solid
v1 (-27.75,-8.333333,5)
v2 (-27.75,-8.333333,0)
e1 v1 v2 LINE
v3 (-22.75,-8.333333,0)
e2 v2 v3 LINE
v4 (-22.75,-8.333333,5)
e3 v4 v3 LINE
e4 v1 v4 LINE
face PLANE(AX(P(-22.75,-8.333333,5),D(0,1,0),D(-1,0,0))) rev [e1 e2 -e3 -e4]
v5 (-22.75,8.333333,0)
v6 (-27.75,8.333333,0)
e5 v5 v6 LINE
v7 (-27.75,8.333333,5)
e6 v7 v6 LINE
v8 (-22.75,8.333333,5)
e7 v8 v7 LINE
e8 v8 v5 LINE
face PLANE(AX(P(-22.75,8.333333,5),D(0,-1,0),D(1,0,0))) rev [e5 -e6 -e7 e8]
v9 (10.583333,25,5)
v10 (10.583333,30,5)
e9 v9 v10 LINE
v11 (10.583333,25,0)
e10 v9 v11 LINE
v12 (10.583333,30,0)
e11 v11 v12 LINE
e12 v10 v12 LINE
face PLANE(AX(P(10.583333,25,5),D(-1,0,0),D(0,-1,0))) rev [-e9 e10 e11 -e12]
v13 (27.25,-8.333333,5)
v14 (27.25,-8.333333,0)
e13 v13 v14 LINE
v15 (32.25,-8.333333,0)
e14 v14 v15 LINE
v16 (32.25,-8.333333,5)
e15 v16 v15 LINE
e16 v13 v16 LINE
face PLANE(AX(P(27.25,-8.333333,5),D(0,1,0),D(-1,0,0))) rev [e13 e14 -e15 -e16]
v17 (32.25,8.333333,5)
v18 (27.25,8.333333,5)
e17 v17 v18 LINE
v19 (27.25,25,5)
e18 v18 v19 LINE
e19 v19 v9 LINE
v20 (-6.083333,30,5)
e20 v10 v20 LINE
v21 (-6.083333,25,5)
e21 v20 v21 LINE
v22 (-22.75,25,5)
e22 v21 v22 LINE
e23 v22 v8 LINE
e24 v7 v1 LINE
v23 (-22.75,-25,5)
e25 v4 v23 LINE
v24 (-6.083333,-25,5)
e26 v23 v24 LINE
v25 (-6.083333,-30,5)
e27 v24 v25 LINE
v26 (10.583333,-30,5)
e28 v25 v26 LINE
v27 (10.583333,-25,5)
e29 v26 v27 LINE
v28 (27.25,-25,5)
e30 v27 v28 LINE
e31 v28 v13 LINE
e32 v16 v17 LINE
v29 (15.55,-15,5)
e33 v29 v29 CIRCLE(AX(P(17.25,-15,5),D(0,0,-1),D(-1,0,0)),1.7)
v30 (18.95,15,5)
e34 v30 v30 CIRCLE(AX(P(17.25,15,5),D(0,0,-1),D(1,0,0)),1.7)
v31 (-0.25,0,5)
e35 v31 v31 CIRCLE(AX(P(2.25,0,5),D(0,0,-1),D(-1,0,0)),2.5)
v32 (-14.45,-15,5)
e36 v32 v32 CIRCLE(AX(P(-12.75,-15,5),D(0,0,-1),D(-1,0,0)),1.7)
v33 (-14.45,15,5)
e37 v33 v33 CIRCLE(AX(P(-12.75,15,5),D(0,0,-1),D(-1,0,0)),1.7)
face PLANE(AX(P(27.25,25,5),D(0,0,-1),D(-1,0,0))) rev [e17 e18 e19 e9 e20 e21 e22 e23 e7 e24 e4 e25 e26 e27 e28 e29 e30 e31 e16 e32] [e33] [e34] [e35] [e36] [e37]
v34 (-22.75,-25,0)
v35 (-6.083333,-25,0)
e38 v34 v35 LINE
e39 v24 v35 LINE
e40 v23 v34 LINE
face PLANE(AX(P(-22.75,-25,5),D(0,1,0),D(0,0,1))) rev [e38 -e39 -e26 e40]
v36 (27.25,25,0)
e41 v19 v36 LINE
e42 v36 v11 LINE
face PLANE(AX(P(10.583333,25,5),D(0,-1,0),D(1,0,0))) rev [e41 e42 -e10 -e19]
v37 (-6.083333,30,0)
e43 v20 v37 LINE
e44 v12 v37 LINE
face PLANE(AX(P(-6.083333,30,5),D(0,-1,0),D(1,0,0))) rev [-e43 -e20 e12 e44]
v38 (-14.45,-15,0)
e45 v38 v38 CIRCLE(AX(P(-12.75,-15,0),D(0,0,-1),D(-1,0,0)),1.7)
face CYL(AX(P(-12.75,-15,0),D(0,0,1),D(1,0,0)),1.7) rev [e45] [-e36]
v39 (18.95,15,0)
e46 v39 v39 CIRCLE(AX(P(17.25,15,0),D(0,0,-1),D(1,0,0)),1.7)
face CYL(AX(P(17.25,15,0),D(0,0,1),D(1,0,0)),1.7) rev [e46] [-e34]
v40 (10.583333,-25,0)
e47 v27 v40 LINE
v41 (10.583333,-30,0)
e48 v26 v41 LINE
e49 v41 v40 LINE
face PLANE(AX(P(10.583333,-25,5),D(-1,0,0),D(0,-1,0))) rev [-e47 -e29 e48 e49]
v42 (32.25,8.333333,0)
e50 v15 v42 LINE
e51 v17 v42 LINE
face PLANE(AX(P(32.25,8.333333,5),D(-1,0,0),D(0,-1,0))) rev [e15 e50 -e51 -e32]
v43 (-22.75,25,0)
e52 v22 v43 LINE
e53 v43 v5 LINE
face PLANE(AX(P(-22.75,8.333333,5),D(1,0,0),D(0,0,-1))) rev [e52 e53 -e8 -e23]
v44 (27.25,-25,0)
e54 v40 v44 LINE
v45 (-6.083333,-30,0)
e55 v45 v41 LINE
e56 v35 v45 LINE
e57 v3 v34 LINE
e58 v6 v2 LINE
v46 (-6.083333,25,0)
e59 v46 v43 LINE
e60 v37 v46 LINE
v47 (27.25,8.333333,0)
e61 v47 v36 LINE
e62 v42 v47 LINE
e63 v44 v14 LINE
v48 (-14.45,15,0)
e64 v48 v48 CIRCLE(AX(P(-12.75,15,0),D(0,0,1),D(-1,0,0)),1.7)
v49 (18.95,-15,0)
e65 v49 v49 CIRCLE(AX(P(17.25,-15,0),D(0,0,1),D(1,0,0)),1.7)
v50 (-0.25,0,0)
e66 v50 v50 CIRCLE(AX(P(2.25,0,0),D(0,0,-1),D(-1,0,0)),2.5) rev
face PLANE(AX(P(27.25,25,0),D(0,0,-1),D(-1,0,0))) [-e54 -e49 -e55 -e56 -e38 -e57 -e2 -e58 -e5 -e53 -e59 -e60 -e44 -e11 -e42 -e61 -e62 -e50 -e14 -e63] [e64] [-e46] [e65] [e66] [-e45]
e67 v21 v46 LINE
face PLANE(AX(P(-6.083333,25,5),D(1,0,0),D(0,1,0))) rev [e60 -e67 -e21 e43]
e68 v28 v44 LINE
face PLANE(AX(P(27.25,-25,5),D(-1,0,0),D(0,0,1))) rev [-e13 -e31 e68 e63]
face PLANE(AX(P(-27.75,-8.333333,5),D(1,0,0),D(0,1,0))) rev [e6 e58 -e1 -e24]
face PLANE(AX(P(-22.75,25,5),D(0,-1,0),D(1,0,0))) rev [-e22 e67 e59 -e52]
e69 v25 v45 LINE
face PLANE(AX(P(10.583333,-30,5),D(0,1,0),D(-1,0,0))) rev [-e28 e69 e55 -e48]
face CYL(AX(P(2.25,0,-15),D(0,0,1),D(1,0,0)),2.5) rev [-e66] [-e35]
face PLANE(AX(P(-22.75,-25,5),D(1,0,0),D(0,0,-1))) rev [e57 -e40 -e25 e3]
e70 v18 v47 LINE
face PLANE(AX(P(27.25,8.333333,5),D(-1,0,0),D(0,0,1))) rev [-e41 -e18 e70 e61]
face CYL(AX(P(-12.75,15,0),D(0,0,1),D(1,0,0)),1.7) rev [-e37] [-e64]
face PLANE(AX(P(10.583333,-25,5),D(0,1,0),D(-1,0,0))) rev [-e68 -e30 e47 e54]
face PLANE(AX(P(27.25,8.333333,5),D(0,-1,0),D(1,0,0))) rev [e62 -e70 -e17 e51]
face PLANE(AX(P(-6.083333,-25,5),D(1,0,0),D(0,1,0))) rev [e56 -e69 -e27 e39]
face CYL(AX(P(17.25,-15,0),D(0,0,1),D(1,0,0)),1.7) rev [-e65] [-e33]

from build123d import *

# Parameters (mm, degrees)
BOSS_EXTRUDE1_DEPTH = 5
CAVITY1_OUTLINE_R   = 2.5
CAVITY1_OUTLINE_R_2 = 1.7
CAVITY1_DEPTH       = 5


# Read off the part's stored shape, not the designer's step: Cavity1
with BuildPart() as part:
    # Sketch1 → Boss-Extrude1 (new body)
    with BuildSketch(Plane.XY):
        Polygon((-22.75, 8.333333333), (-22.75, 25), (-6.083333333, 25), (-6.083333333, 30), (10.583333333, 30), (10.583333333, 25), (27.25, 25), (27.25, 8.333333333), (32.25, 8.333333333), (32.25, -8.333333333), (27.25, -8.333333333), (27.25, -25), (10.583333333, -25), (10.583333333, -30), (-6.083333333, -30), (-6.083333333, -25), (-22.75, -25), (-22.75, -8.333333333), (-27.75, -8.333333333), (-27.75, 8.333333333), align=None)
    extrude(amount=BOSS_EXTRUDE1_DEPTH)

    # Cavity1 outline → Cavity1 (cut)
    with BuildSketch(Plane.XY):
        with Locations((2.25, 0)):
            Circle(CAVITY1_OUTLINE_R)
        with Locations((-12.75, 15)):
            Circle(CAVITY1_OUTLINE_R_2)
        with Locations((17.25, 15)):
            Circle(CAVITY1_OUTLINE_R_2)
        with Locations((17.25, -15)):
            Circle(CAVITY1_OUTLINE_R_2)
        with Locations((-12.75, -15)):
            Circle(CAVITY1_OUTLINE_R_2)
    extrude(amount=CAVITY1_DEPTH, mode=Mode.SUBTRACT)


solid = part.part
